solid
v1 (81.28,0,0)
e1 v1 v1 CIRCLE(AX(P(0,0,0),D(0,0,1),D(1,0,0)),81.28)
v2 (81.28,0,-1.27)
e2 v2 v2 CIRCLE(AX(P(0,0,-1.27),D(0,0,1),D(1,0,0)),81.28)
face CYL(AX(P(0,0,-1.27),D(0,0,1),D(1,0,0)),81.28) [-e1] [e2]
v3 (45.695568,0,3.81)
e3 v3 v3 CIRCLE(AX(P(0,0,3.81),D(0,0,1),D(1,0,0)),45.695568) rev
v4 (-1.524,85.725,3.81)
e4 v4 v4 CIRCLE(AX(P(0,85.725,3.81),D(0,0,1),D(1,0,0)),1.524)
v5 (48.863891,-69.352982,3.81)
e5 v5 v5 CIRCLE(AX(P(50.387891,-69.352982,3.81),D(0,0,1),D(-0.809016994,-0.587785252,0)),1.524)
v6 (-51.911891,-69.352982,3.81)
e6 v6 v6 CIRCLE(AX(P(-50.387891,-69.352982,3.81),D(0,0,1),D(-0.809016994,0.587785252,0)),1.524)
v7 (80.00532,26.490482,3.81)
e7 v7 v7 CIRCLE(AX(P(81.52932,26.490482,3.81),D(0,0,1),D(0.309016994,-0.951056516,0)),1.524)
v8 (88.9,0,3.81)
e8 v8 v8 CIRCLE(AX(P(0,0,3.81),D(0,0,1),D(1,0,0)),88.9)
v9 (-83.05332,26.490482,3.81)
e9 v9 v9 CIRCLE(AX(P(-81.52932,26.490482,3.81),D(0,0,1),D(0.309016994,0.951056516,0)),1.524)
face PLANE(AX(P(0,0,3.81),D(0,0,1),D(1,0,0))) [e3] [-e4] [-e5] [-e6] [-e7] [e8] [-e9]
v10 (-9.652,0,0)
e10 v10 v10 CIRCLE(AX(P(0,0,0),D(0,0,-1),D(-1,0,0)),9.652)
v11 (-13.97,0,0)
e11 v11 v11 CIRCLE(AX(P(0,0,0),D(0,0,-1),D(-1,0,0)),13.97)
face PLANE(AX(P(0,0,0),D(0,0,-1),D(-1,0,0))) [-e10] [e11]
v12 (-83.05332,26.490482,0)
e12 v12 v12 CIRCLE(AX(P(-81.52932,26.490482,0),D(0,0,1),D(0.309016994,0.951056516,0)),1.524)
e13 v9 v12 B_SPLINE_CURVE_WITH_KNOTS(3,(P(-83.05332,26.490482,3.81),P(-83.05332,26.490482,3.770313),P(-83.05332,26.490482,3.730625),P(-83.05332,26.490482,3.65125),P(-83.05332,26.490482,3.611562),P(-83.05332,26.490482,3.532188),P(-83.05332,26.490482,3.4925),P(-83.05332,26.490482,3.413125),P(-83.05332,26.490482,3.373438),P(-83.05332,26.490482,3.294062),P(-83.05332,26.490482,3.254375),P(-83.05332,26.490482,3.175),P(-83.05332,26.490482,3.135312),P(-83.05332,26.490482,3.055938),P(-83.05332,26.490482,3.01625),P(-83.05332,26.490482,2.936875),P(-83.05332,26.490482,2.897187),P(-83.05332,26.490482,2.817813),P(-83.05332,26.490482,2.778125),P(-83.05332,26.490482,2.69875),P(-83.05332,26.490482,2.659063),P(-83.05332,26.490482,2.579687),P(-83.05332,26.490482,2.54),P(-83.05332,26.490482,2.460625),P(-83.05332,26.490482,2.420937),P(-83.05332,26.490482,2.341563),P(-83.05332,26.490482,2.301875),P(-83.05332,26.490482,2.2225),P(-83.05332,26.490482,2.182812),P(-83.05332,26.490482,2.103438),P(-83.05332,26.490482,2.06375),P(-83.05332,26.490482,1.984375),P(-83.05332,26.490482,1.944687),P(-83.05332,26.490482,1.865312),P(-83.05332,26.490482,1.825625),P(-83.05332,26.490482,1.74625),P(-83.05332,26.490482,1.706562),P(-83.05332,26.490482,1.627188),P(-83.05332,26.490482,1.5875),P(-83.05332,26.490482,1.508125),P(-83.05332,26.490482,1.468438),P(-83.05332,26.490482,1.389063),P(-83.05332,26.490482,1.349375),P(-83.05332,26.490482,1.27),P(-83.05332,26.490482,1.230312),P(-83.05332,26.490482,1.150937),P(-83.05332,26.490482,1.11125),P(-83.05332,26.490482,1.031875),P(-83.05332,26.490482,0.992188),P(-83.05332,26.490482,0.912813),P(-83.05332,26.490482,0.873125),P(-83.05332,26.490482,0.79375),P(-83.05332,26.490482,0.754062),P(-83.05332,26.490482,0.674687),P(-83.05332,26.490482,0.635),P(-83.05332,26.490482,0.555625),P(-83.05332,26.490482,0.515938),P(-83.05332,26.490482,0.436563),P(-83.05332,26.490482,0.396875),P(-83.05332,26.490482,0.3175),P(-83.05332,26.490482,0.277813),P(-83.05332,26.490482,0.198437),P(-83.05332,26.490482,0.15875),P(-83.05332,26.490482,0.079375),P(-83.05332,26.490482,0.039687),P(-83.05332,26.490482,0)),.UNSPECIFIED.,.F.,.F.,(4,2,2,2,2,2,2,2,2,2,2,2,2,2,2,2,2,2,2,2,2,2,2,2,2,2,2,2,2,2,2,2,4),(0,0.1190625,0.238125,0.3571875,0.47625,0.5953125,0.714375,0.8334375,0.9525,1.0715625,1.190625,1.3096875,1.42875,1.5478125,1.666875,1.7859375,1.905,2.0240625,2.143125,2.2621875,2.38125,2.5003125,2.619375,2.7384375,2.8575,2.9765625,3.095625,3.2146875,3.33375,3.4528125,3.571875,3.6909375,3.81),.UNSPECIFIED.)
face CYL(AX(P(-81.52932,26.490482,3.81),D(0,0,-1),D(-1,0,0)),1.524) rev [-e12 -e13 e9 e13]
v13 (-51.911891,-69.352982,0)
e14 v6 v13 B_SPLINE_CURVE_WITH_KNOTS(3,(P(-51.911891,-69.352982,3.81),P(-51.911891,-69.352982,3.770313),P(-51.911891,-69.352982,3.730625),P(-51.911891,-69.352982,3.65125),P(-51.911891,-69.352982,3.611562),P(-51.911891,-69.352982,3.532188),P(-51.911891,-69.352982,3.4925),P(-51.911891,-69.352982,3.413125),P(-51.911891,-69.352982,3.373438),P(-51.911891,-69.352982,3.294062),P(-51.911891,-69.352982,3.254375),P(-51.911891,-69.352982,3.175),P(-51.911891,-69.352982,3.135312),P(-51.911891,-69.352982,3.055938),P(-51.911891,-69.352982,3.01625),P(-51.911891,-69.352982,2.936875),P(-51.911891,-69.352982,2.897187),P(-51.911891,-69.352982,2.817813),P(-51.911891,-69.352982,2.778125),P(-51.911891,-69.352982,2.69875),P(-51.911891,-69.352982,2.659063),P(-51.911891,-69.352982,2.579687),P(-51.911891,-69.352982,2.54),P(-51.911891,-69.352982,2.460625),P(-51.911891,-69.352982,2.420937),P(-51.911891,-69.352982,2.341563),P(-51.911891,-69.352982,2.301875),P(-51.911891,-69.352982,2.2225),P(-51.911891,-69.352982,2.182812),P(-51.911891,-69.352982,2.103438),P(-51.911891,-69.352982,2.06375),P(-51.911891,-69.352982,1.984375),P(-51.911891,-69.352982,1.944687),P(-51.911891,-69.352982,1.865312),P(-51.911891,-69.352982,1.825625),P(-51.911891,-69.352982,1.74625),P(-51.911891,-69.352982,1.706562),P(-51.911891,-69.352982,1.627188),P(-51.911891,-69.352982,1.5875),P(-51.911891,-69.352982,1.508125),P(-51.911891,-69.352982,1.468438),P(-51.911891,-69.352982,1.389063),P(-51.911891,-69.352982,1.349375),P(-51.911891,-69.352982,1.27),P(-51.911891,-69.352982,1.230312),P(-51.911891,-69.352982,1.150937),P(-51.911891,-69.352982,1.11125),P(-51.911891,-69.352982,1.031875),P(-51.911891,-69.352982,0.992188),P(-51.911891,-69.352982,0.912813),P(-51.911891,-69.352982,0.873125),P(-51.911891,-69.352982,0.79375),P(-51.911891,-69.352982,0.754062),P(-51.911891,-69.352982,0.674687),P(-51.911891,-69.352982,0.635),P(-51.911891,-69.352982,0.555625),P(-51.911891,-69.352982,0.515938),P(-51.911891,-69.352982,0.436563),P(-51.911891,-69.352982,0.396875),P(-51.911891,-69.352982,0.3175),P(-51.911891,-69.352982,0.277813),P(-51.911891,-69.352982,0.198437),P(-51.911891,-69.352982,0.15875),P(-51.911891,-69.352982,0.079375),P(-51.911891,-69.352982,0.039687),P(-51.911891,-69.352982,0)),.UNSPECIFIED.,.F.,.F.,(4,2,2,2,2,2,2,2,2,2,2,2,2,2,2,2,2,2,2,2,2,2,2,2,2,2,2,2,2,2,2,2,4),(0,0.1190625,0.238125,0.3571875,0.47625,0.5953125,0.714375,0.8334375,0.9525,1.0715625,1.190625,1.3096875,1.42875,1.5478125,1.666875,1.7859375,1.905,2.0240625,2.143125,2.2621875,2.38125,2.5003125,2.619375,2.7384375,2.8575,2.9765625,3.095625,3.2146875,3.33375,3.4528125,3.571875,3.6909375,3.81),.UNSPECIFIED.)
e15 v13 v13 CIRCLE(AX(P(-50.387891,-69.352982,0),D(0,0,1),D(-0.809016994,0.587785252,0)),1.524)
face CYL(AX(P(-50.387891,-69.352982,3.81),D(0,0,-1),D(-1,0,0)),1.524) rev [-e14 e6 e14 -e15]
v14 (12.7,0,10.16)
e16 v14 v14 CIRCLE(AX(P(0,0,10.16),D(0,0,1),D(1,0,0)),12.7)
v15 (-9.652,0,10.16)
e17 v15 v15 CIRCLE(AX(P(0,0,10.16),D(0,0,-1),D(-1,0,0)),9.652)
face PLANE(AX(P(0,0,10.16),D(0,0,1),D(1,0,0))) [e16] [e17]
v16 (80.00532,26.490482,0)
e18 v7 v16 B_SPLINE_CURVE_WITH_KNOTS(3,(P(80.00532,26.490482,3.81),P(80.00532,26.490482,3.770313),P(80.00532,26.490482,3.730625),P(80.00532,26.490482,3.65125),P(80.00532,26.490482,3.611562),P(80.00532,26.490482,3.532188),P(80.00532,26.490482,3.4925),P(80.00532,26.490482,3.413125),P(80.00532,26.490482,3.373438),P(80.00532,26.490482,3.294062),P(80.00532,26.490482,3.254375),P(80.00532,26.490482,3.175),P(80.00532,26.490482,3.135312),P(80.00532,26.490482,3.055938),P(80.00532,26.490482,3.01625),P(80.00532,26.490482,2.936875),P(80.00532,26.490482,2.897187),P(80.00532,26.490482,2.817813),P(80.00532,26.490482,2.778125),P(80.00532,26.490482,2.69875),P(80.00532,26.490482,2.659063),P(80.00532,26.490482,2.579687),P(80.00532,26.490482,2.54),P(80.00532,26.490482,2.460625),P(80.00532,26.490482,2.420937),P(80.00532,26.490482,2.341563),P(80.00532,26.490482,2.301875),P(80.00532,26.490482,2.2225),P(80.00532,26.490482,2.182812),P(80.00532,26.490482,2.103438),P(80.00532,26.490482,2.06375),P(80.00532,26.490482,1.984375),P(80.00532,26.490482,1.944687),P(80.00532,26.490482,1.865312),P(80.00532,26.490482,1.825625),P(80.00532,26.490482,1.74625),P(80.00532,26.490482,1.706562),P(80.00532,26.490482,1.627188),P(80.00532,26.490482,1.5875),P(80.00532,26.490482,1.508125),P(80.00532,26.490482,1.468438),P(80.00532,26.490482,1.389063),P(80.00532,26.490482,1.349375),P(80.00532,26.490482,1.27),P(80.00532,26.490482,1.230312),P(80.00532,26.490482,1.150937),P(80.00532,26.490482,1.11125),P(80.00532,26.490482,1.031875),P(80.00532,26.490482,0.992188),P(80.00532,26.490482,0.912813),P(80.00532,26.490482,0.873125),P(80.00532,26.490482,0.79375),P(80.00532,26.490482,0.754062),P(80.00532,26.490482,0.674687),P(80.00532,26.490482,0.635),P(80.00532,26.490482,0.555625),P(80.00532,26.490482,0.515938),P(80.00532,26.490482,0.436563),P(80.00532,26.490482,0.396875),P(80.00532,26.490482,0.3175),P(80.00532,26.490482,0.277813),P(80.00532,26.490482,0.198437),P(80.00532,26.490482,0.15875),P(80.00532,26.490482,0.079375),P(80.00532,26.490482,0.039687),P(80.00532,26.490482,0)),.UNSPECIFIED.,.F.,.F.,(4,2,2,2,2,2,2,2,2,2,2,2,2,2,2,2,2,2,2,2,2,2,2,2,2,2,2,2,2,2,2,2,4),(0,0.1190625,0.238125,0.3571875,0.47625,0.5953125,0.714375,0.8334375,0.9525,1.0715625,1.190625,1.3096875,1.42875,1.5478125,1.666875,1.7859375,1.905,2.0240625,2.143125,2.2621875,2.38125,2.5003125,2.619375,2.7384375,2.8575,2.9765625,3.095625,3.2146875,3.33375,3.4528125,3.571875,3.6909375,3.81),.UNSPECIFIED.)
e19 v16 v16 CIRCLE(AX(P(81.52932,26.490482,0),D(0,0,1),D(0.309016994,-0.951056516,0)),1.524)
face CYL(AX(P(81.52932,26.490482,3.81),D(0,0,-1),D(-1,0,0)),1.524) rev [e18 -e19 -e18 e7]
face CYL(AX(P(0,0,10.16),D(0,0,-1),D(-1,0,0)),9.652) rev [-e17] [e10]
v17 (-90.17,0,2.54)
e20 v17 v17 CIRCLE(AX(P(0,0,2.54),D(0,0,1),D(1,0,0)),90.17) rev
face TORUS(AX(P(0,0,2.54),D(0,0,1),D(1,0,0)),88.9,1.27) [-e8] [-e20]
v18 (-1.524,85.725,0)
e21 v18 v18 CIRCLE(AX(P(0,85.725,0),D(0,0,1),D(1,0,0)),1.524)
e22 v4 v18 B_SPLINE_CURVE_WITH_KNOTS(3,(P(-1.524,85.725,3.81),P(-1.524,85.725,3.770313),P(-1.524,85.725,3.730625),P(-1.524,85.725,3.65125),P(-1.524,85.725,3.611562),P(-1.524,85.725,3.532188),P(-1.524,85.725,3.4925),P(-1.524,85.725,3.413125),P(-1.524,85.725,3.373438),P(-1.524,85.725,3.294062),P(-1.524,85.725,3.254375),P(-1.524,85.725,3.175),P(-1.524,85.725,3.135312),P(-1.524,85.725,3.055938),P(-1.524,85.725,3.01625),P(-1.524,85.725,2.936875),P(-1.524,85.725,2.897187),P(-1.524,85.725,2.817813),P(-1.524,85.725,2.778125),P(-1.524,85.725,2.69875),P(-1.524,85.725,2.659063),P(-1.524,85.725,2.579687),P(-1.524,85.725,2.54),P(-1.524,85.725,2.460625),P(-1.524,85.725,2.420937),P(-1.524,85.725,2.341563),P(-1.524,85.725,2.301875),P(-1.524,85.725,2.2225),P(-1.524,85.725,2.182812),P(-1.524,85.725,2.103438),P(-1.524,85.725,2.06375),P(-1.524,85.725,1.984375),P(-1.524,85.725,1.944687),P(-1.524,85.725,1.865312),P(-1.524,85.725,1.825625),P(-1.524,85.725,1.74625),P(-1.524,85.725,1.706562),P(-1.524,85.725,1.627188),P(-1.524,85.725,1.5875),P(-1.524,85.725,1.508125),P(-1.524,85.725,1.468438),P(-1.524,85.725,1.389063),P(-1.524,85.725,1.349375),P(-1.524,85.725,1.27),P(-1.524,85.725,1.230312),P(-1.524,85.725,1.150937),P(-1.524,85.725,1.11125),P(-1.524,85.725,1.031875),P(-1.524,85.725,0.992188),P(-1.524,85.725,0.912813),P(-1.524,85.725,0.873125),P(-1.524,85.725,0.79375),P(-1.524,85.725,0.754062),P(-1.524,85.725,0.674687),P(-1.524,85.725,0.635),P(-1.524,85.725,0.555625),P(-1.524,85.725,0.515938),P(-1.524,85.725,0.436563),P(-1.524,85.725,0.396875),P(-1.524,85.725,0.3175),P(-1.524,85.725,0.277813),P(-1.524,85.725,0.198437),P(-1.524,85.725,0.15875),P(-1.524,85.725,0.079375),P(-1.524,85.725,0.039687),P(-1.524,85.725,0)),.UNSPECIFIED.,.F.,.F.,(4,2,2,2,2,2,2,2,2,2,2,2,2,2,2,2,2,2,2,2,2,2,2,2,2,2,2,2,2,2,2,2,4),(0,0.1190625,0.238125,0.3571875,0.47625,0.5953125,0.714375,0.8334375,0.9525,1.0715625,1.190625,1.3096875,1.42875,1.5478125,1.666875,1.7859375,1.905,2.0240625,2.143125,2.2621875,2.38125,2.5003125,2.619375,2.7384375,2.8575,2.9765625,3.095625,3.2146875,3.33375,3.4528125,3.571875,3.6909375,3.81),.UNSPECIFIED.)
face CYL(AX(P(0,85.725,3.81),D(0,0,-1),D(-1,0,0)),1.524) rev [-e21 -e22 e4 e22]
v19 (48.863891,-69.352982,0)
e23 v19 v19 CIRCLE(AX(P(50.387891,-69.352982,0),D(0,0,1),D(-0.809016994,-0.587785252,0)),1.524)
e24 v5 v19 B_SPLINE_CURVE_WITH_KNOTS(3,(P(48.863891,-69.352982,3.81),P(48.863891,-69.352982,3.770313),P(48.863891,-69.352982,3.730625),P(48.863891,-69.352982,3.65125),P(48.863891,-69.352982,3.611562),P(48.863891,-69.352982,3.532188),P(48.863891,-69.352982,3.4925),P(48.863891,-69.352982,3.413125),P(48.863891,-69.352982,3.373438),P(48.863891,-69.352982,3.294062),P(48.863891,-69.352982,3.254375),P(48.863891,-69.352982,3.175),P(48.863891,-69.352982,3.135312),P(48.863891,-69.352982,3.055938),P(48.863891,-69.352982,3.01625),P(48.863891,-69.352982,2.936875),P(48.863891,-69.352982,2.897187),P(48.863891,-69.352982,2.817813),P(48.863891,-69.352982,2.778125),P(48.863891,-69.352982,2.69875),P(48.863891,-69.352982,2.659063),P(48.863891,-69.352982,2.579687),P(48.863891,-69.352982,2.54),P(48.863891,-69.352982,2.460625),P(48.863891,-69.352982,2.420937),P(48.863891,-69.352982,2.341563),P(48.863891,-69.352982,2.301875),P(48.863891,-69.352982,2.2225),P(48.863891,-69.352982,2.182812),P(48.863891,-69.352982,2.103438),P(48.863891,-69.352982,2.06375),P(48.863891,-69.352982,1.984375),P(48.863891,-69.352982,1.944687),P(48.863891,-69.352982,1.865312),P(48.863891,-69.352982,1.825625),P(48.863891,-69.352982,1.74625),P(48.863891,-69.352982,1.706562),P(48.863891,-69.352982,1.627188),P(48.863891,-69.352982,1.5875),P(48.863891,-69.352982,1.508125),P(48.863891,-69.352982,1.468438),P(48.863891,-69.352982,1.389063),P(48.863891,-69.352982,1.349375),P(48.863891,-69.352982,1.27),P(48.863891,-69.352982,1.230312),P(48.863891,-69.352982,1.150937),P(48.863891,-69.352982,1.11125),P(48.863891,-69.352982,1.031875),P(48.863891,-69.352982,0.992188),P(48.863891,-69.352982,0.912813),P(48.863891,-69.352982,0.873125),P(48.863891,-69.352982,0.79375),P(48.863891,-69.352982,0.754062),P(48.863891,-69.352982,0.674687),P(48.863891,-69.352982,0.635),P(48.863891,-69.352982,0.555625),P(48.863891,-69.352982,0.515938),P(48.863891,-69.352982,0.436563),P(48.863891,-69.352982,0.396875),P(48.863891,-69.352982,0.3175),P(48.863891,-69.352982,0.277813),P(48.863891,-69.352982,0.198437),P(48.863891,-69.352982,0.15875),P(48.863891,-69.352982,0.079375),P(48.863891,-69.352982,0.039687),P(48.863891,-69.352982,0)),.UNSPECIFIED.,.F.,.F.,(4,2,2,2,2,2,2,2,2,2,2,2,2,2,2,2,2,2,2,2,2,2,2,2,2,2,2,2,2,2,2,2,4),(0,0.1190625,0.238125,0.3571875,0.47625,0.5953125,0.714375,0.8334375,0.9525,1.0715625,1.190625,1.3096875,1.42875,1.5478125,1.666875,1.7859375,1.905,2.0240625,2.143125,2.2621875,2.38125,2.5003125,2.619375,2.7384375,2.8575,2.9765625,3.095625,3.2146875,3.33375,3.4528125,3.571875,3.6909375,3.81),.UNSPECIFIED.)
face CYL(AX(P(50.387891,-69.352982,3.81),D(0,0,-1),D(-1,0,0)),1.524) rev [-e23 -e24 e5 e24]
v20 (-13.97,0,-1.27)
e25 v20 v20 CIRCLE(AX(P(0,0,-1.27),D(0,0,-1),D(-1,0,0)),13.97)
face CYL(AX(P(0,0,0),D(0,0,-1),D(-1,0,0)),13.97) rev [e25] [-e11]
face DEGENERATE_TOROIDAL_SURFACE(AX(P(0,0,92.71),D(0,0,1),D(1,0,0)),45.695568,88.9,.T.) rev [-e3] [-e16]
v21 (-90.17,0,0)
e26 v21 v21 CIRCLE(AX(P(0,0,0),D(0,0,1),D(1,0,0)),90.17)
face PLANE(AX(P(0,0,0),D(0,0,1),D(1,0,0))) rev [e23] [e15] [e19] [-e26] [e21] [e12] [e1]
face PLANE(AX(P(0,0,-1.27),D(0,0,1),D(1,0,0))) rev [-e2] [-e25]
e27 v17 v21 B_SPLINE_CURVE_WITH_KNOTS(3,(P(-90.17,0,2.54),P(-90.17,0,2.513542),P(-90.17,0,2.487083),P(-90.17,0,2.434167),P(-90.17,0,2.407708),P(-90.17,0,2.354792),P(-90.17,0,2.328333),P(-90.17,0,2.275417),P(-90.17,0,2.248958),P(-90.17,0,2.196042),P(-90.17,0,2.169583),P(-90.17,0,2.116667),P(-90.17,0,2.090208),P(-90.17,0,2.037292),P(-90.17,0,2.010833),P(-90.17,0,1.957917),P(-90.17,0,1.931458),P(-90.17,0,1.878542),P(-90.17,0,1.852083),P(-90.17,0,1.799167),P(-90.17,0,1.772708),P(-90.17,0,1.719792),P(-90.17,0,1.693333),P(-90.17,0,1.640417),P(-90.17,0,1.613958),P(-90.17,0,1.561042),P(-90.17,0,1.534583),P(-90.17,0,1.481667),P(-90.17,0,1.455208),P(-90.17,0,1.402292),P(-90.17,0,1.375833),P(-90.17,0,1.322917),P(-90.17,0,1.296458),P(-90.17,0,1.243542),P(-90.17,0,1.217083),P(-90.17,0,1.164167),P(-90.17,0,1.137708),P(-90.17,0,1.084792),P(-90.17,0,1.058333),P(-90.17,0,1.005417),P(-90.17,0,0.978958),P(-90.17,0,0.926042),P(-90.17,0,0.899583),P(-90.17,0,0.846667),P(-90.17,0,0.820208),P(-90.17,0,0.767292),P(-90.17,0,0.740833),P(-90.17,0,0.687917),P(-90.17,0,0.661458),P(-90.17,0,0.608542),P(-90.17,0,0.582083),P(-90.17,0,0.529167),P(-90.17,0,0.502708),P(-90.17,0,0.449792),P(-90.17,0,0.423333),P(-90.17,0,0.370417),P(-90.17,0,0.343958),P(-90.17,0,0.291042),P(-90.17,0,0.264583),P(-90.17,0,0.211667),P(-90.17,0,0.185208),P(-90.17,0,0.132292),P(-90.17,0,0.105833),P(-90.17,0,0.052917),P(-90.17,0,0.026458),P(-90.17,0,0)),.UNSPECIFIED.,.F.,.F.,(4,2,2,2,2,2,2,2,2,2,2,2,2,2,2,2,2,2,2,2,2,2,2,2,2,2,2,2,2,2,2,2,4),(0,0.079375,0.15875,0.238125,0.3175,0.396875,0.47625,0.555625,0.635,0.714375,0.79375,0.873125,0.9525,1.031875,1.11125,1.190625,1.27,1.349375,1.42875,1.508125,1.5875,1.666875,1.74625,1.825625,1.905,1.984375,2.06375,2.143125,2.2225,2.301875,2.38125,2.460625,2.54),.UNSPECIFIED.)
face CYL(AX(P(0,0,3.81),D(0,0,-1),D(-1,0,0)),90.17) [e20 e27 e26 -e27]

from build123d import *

# Parameters (mm, degrees)
SKETCH2_R           = 81.28
BOSS_EXTRUDE1_DEPTH = 1.27
SKETCH3_R           = 90.17
BOSS_EXTRUDE2_DEPTH = 3.81
SKETCH4_R           = 1.524
CUT_EXTRUDE2_DEPTH  = 128.576541339
CIRPATTERN1_COUNT   = 5
SKETCH14_R          = 12.7
SKETCH14_R_2        = 6.477
BOSS_EXTRUDE3_DEPTH = 6.35
SKETCH23_R          = 13.97
CUT_EXTRUDE3_DEPTH  = 1.27
SKETCH24_R          = 9.652
CUT_EXTRUDE4_DEPTH  = 128.923740564
FILLET1_R           = 88.9
FILLET2_R           = 1.27


with BuildPart() as part:
    # Sketch2 → Boss-Extrude1 (new body)
    with BuildSketch(Plane.XY):
        Circle(SKETCH2_R)
    extrude(amount=-BOSS_EXTRUDE1_DEPTH)

    # Sketch3 → Boss-Extrude2 (add)
    with BuildSketch(Plane.XY):
        with Locations(Location((0, 0, 0), (0, 0, 180))):
            Circle(SKETCH3_R)
    extrude(amount=BOSS_EXTRUDE2_DEPTH)

    # Sketch4 → Cut-Extrude2 (cut, through all)
    with BuildSketch(Plane.XY):
        with Locations(Location((0, 85.725, 0), (0, 0, 180))):
            Circle(SKETCH4_R)
    cut_extrude2 = extrude(amount=CUT_EXTRUDE2_DEPTH, mode=Mode.SUBTRACT)

    # CirPattern1: Cut-Extrude2 ×5 about axis
    cirpattern1_axis = Axis((0, 0, 0), (0, 0, 1))
    for i in range(1, CIRPATTERN1_COUNT):
        add(cut_extrude2.rotate(cirpattern1_axis, i * 360 / CIRPATTERN1_COUNT), mode=Mode.SUBTRACT)

    # Sketch14 → Boss-Extrude3 (add)
    with BuildSketch(Plane.XY.offset(3.81)):
        Circle(SKETCH14_R)
        Circle(SKETCH14_R_2, mode=Mode.SUBTRACT)
    extrude(amount=BOSS_EXTRUDE3_DEPTH)

    # Sketch23 → Cut-Extrude3 (cut)
    with BuildSketch(Plane(origin=(0, 0, -1.27), x_dir=(-1, 0, 0), z_dir=(0, 0, -1))):
        Circle(SKETCH23_R)
    extrude(amount=-CUT_EXTRUDE3_DEPTH, mode=Mode.SUBTRACT)

    # Sketch24 → Cut-Extrude4 (cut, through all)
    with BuildSketch(Plane(origin=(0, 0, 0), x_dir=(-1, 0, 0), z_dir=(0, 0, -1))):
        Circle(SKETCH24_R)
    extrude(amount=-CUT_EXTRUDE4_DEPTH, mode=Mode.SUBTRACT)

    # Fillet1
    # the kernel refuses this fillet: 88.9 mm, written as the material it adds along each edge
    with BuildSketch(Plane(origin=(0, 0, 3.81), x_dir=(1, 0, 0), z_dir=(0, -1, 0))) as fillet1_piece_1:
        with BuildLine():
            CenterArc((45.695567884, 88.9), FILLET1_R, 248.213210702, 21.786789298)
            Line((12.7, 6.35), (12.7, 0))
            Line((12.7, 0), (45.695567884, 0))
        make_face()
    revolve(axis=Axis((0, 0, 3.81), (0, 0, 1)))

    # Fillet2
    fillet2_edges = [part.edges().sort_by_distance(p)[0] for p in [
        (90.17, 0, 3.81),
    ]]
    fillet(fillet2_edges, radius=FILLET2_R)


solid = part.part
